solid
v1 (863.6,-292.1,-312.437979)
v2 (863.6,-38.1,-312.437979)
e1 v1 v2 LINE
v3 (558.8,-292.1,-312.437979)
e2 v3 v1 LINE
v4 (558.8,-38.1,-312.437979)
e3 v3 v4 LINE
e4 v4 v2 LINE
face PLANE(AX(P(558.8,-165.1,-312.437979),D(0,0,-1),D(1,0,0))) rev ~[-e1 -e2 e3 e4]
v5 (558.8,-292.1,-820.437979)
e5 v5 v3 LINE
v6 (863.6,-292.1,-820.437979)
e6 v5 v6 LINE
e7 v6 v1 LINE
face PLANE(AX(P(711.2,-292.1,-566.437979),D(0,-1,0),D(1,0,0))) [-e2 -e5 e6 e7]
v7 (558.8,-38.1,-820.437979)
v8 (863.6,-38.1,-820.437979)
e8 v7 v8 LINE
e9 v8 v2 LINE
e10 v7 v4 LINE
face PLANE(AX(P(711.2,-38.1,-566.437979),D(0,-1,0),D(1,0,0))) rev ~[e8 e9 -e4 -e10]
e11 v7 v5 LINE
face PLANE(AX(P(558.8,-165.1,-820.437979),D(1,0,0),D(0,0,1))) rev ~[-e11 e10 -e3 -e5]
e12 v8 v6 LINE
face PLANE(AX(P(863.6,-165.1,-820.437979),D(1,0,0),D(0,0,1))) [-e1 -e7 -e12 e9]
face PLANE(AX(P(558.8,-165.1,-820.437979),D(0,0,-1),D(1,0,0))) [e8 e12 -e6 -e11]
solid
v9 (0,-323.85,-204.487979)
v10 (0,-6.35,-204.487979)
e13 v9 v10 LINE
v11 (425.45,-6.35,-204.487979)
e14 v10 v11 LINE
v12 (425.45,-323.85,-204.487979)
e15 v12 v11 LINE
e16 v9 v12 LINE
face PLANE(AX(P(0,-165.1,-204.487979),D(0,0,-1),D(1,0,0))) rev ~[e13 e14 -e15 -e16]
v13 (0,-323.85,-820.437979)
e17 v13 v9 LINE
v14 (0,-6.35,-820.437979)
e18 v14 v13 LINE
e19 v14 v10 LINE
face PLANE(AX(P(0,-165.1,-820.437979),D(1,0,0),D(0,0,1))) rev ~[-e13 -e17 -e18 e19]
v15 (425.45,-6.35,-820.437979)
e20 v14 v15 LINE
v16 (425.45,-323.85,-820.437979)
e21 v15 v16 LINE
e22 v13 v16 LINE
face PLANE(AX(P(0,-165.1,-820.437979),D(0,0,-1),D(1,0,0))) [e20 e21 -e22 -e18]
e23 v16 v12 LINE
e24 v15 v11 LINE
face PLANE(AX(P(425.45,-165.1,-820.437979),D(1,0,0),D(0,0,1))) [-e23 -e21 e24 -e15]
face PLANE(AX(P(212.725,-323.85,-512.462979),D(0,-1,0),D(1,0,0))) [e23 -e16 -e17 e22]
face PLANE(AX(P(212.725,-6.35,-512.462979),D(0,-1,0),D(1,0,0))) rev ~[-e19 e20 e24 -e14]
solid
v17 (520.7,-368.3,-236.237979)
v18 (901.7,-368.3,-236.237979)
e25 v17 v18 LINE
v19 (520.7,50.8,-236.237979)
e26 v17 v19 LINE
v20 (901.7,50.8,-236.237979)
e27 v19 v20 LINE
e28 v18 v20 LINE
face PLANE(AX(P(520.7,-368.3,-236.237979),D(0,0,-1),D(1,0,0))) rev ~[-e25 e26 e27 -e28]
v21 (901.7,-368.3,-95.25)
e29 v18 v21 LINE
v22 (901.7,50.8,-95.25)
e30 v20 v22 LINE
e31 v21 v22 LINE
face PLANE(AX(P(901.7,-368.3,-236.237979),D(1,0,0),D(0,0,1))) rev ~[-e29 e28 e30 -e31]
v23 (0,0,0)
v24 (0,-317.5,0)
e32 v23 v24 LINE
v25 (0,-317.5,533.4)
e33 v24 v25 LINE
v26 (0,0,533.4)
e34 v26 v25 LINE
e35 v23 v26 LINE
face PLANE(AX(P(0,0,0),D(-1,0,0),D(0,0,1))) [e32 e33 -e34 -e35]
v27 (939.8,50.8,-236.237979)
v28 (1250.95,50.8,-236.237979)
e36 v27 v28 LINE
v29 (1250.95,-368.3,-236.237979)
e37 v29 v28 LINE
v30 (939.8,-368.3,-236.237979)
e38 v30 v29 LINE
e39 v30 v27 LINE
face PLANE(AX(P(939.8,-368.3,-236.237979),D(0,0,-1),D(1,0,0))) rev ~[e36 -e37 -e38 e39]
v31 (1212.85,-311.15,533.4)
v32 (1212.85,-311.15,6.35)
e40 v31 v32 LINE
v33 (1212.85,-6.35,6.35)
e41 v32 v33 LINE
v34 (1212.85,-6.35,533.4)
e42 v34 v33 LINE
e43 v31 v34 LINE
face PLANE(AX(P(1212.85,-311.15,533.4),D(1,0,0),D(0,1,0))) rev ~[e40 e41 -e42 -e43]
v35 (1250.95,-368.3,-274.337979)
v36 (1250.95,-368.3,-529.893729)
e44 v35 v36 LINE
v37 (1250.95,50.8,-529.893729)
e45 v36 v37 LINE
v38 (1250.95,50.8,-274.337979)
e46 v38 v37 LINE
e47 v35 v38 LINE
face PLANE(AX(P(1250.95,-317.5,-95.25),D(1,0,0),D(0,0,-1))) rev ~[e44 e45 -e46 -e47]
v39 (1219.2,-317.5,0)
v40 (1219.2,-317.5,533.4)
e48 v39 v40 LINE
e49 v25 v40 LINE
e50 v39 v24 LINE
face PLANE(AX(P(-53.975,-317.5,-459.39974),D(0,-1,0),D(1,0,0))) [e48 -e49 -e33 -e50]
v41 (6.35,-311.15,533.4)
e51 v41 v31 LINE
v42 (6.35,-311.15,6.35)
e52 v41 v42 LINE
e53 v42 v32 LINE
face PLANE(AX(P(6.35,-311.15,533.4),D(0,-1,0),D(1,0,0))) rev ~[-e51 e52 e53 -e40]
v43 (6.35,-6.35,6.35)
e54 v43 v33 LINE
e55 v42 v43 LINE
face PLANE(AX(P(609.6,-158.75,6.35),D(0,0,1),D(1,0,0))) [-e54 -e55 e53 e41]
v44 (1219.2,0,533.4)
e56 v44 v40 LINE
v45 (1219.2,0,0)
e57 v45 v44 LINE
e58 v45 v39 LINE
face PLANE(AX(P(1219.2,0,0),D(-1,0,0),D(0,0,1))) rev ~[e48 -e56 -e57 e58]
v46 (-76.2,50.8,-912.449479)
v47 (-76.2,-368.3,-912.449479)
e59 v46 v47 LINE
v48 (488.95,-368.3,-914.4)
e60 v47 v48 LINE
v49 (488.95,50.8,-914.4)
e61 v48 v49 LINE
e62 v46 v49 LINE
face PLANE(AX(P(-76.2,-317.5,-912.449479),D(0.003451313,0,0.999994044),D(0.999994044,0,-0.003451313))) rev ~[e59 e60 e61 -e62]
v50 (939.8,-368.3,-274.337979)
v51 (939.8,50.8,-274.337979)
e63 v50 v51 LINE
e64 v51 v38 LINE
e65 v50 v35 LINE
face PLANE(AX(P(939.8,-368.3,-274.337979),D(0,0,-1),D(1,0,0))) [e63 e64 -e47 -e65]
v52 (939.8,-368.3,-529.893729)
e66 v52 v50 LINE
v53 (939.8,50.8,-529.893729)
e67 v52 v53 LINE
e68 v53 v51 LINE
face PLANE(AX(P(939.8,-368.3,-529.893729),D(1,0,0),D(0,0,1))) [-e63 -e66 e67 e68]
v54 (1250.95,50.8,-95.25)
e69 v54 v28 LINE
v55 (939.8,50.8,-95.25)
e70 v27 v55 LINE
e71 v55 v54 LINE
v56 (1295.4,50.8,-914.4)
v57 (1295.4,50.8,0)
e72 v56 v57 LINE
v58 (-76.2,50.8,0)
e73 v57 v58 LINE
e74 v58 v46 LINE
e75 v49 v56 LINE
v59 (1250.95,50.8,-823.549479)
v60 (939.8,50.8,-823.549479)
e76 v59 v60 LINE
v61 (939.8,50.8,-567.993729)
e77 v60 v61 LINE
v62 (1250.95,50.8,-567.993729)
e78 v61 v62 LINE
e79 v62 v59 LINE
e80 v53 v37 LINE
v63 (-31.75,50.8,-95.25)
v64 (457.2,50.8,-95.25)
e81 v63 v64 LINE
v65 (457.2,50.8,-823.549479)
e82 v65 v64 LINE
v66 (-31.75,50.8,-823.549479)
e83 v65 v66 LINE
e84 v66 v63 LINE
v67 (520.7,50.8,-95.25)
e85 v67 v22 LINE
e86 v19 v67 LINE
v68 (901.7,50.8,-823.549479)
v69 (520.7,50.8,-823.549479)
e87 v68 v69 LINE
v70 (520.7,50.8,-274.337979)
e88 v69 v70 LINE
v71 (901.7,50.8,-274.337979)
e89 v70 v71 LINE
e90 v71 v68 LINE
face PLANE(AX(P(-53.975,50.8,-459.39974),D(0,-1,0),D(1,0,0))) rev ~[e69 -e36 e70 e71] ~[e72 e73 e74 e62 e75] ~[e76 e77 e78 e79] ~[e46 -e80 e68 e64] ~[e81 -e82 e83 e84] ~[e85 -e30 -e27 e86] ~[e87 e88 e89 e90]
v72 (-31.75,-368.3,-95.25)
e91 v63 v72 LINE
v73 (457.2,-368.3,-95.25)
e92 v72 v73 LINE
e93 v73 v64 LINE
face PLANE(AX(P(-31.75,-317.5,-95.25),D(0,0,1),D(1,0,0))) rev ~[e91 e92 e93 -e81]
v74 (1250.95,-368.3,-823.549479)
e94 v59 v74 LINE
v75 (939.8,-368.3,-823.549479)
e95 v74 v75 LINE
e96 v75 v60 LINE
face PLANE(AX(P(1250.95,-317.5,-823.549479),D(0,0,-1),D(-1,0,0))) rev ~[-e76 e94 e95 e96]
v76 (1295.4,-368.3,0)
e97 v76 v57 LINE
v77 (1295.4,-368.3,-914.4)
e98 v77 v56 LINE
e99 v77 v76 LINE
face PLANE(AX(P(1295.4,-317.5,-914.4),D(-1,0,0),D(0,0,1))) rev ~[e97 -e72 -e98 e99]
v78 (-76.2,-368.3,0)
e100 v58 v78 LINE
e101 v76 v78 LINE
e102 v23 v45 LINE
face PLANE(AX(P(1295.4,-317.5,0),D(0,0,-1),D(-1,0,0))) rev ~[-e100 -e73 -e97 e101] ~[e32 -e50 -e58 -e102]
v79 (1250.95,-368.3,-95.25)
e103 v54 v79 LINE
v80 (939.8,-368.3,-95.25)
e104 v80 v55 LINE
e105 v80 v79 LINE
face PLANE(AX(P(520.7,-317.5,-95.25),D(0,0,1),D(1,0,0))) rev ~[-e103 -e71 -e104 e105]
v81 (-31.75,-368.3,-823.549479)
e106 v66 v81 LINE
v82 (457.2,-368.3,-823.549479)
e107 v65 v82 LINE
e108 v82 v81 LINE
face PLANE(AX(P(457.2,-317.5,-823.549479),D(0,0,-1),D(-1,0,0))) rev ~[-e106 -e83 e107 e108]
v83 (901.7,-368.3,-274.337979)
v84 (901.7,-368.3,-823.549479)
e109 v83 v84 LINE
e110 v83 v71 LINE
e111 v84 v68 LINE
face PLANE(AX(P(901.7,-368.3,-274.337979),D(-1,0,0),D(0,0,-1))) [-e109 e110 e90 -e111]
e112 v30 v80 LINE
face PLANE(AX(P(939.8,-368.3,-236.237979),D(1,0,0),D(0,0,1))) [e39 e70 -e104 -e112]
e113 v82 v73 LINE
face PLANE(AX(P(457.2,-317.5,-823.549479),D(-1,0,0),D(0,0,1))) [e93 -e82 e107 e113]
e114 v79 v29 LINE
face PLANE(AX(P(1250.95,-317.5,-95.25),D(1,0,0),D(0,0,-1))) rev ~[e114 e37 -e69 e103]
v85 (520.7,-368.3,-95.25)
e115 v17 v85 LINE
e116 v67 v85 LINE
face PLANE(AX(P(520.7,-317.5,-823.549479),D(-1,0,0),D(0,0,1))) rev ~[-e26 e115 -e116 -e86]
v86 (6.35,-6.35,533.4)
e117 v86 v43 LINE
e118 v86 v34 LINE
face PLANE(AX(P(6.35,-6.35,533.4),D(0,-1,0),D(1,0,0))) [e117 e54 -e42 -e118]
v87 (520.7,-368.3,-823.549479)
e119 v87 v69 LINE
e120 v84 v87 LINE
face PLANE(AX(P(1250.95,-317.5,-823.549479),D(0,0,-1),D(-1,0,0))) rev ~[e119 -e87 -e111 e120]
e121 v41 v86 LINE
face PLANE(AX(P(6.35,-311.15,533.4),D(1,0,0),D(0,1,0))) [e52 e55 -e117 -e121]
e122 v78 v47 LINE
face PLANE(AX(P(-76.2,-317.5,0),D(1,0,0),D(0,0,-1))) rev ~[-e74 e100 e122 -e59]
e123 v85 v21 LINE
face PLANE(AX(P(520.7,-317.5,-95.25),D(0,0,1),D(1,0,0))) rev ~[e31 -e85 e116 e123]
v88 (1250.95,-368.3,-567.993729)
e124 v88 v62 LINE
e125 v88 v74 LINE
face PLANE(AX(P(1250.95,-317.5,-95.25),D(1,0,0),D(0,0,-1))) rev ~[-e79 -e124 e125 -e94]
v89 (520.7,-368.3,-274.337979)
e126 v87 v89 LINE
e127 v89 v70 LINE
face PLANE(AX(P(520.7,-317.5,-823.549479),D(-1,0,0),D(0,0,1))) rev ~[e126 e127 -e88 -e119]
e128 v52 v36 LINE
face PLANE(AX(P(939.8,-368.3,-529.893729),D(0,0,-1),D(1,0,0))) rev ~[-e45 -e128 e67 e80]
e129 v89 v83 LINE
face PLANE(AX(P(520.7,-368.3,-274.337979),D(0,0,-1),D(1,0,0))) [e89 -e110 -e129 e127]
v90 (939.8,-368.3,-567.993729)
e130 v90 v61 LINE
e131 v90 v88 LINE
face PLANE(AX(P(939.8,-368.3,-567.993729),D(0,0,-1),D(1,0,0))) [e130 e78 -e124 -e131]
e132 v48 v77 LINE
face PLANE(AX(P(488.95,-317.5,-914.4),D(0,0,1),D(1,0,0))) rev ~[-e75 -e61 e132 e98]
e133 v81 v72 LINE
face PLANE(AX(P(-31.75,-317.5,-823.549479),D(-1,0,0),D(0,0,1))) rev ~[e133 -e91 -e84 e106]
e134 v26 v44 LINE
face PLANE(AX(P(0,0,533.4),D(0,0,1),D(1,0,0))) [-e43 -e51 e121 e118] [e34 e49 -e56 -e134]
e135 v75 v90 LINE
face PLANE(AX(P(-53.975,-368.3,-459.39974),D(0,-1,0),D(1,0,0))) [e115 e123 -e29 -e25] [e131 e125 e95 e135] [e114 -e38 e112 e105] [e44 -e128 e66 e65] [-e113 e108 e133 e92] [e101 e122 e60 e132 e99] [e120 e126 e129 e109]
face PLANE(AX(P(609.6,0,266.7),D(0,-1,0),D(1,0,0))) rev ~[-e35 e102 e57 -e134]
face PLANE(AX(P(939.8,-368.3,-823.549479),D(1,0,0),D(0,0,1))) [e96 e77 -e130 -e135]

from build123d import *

# Parameters (mm, degrees)
F0_W           = 1219.2
F0_H           = 533.4
F1_DEPTH       = 317.5
F2_W           = 1206.5
F2_H           = 304.8
F3_DEPTH       = 527.05
F4_W           = 44.45
F4_H           = 728.299479103
F4_W_2         = 31.75
F4_H_2         = 90.850520897
F4_H_3         = 95.25
F5_DEPTH       = 368.3
F5_DEPTH_BACK  = 50.8
F8_W           = 425.45
F8_H           = 615.95
F9_DEPTH       = 158.75
F9_DEPTH_BACK  = 158.75
F10_W          = 304.8
F10_H          = 508
F11_DEPTH      = 127
F11_DEPTH_BACK = 127
F12_W          = 381
F12_H          = 38.1
F12_W_2        = 38.1
F12_H_2        = 140.987979103
F12_W_3        = 311.15
F13_DEPTH      = 419.1


with BuildPart() as f1:
    # F0 (on Front) → F1 (new body)
    with BuildSketch(Plane.XZ):
        with Locations((609.6, 266.7)):
            Rectangle(F0_W, F0_H)
    extrude(amount=F1_DEPTH)

    # F2 (on face) → F3 (cut)
    with BuildSketch(Plane.XY.offset(533.4)):
        with Locations((609.6, -158.75)):
            Rectangle(F2_W, F2_H)
    extrude(amount=-F3_DEPTH, mode=Mode.SUBTRACT)

    # F4 (on face) → F5 (join, two sides)
    with BuildSketch(Plane.XZ.offset(317.5)) as f5_sk:
        with Locations((-53.975, -459.3997395515)):
            Rectangle(F4_W, F4_H)
        Polygon((-31.75, -823.549479103), (-76.2, -823.549479103), (-76.2, -912.449479103), (457.2, -914.2904201743), (457.2, -823.549479103), align=None)
        with Locations((473.075, -459.3997395515)):
            Rectangle(F4_W_2, F4_H)
        with Locations((504.825, -459.3997395515)):
            Rectangle(F4_W_2, F4_H)
        Polygon((488.95, -823.549479103), (457.2, -823.549479103), (457.2, -914.2904201743), (488.95, -914.4), align=None)
        Polygon((520.7, -823.549479103), (488.95, -823.549479103), (488.95, -914.4), (1250.95, -914.4), (1250.95, -823.549479103), align=None)
        with Locations((1273.175, -868.9747395515)):
            Rectangle(F4_W, F4_H_2)
        with Locations((1273.175, -459.3997395515)):
            Rectangle(F4_W, F4_H)
        with Locations((1273.175, -47.625)):
            Rectangle(F4_W, F4_H_3)
        Polygon((1219.2, 0), (520.7, 0), (520.7, -95.25), (1250.95, -95.25), (1250.95, 0), align=None)
        Polygon((0, 0), (-31.75, 0), (-31.75, -95.25), (457.2, -95.25), (457.2, 0), align=None)
        with Locations((-53.975, -47.625)):
            Rectangle(F4_W, F4_H_3)
        with Locations((504.825, -47.625)):
            Rectangle(F4_W_2, F4_H_3)
        with Locations((473.075, -47.625)):
            Rectangle(F4_W_2, F4_H_3)
    extrude(amount=-F5_DEPTH)
    extrude(f5_sk.sketch, amount=F5_DEPTH_BACK)

    # F12 (on face) → F13 (join, through all)
    with BuildSketch(Plane.XZ.offset(368.3)):
        with Locations((711.2, -255.287979103)):
            Rectangle(F12_W, F12_H)
        with Locations((920.75, -165.7439895515)):
            Rectangle(F12_W_2, F12_H_2)
        with Locations((920.75, -255.287979103)):
            Rectangle(F12_W_2, F12_H)
        with Locations((1095.375, -255.287979103)):
            Rectangle(F12_W_3, F12_H)
        Polygon((939.8, -274.337979103), (901.7, -274.337979103), (901.7, -823.549479103), (939.8, -823.549479103), (939.8, -567.993729103), (939.8, -529.893729103), align=None)
        with Locations((1095.375, -548.943729103)):
            Rectangle(F12_W_3, F12_H)
    extrude(amount=-F13_DEPTH)


with BuildPart() as f9:
    # F8 (on face) → F9 (new body, two sides)
    with BuildSketch(Plane.XZ.offset(165.1)) as f9_sk:
        with Locations((212.725, -512.462979103)):
            Rectangle(F8_W, F8_H)
    extrude(amount=F9_DEPTH)
    extrude(f9_sk.sketch, amount=-F9_DEPTH_BACK)


with BuildPart() as f11:
    # F10 (on face) → F11 (new body, two sides)
    with BuildSketch(Plane.XZ.offset(165.1)) as f11_sk:
        with Locations((711.2, -566.437979103)):
            Rectangle(F10_W, F10_H)
    extrude(amount=F11_DEPTH)
    extrude(f11_sk.sketch, amount=-F11_DEPTH_BACK)


solid = Compound([f1.part, f9.part, f11.part])
